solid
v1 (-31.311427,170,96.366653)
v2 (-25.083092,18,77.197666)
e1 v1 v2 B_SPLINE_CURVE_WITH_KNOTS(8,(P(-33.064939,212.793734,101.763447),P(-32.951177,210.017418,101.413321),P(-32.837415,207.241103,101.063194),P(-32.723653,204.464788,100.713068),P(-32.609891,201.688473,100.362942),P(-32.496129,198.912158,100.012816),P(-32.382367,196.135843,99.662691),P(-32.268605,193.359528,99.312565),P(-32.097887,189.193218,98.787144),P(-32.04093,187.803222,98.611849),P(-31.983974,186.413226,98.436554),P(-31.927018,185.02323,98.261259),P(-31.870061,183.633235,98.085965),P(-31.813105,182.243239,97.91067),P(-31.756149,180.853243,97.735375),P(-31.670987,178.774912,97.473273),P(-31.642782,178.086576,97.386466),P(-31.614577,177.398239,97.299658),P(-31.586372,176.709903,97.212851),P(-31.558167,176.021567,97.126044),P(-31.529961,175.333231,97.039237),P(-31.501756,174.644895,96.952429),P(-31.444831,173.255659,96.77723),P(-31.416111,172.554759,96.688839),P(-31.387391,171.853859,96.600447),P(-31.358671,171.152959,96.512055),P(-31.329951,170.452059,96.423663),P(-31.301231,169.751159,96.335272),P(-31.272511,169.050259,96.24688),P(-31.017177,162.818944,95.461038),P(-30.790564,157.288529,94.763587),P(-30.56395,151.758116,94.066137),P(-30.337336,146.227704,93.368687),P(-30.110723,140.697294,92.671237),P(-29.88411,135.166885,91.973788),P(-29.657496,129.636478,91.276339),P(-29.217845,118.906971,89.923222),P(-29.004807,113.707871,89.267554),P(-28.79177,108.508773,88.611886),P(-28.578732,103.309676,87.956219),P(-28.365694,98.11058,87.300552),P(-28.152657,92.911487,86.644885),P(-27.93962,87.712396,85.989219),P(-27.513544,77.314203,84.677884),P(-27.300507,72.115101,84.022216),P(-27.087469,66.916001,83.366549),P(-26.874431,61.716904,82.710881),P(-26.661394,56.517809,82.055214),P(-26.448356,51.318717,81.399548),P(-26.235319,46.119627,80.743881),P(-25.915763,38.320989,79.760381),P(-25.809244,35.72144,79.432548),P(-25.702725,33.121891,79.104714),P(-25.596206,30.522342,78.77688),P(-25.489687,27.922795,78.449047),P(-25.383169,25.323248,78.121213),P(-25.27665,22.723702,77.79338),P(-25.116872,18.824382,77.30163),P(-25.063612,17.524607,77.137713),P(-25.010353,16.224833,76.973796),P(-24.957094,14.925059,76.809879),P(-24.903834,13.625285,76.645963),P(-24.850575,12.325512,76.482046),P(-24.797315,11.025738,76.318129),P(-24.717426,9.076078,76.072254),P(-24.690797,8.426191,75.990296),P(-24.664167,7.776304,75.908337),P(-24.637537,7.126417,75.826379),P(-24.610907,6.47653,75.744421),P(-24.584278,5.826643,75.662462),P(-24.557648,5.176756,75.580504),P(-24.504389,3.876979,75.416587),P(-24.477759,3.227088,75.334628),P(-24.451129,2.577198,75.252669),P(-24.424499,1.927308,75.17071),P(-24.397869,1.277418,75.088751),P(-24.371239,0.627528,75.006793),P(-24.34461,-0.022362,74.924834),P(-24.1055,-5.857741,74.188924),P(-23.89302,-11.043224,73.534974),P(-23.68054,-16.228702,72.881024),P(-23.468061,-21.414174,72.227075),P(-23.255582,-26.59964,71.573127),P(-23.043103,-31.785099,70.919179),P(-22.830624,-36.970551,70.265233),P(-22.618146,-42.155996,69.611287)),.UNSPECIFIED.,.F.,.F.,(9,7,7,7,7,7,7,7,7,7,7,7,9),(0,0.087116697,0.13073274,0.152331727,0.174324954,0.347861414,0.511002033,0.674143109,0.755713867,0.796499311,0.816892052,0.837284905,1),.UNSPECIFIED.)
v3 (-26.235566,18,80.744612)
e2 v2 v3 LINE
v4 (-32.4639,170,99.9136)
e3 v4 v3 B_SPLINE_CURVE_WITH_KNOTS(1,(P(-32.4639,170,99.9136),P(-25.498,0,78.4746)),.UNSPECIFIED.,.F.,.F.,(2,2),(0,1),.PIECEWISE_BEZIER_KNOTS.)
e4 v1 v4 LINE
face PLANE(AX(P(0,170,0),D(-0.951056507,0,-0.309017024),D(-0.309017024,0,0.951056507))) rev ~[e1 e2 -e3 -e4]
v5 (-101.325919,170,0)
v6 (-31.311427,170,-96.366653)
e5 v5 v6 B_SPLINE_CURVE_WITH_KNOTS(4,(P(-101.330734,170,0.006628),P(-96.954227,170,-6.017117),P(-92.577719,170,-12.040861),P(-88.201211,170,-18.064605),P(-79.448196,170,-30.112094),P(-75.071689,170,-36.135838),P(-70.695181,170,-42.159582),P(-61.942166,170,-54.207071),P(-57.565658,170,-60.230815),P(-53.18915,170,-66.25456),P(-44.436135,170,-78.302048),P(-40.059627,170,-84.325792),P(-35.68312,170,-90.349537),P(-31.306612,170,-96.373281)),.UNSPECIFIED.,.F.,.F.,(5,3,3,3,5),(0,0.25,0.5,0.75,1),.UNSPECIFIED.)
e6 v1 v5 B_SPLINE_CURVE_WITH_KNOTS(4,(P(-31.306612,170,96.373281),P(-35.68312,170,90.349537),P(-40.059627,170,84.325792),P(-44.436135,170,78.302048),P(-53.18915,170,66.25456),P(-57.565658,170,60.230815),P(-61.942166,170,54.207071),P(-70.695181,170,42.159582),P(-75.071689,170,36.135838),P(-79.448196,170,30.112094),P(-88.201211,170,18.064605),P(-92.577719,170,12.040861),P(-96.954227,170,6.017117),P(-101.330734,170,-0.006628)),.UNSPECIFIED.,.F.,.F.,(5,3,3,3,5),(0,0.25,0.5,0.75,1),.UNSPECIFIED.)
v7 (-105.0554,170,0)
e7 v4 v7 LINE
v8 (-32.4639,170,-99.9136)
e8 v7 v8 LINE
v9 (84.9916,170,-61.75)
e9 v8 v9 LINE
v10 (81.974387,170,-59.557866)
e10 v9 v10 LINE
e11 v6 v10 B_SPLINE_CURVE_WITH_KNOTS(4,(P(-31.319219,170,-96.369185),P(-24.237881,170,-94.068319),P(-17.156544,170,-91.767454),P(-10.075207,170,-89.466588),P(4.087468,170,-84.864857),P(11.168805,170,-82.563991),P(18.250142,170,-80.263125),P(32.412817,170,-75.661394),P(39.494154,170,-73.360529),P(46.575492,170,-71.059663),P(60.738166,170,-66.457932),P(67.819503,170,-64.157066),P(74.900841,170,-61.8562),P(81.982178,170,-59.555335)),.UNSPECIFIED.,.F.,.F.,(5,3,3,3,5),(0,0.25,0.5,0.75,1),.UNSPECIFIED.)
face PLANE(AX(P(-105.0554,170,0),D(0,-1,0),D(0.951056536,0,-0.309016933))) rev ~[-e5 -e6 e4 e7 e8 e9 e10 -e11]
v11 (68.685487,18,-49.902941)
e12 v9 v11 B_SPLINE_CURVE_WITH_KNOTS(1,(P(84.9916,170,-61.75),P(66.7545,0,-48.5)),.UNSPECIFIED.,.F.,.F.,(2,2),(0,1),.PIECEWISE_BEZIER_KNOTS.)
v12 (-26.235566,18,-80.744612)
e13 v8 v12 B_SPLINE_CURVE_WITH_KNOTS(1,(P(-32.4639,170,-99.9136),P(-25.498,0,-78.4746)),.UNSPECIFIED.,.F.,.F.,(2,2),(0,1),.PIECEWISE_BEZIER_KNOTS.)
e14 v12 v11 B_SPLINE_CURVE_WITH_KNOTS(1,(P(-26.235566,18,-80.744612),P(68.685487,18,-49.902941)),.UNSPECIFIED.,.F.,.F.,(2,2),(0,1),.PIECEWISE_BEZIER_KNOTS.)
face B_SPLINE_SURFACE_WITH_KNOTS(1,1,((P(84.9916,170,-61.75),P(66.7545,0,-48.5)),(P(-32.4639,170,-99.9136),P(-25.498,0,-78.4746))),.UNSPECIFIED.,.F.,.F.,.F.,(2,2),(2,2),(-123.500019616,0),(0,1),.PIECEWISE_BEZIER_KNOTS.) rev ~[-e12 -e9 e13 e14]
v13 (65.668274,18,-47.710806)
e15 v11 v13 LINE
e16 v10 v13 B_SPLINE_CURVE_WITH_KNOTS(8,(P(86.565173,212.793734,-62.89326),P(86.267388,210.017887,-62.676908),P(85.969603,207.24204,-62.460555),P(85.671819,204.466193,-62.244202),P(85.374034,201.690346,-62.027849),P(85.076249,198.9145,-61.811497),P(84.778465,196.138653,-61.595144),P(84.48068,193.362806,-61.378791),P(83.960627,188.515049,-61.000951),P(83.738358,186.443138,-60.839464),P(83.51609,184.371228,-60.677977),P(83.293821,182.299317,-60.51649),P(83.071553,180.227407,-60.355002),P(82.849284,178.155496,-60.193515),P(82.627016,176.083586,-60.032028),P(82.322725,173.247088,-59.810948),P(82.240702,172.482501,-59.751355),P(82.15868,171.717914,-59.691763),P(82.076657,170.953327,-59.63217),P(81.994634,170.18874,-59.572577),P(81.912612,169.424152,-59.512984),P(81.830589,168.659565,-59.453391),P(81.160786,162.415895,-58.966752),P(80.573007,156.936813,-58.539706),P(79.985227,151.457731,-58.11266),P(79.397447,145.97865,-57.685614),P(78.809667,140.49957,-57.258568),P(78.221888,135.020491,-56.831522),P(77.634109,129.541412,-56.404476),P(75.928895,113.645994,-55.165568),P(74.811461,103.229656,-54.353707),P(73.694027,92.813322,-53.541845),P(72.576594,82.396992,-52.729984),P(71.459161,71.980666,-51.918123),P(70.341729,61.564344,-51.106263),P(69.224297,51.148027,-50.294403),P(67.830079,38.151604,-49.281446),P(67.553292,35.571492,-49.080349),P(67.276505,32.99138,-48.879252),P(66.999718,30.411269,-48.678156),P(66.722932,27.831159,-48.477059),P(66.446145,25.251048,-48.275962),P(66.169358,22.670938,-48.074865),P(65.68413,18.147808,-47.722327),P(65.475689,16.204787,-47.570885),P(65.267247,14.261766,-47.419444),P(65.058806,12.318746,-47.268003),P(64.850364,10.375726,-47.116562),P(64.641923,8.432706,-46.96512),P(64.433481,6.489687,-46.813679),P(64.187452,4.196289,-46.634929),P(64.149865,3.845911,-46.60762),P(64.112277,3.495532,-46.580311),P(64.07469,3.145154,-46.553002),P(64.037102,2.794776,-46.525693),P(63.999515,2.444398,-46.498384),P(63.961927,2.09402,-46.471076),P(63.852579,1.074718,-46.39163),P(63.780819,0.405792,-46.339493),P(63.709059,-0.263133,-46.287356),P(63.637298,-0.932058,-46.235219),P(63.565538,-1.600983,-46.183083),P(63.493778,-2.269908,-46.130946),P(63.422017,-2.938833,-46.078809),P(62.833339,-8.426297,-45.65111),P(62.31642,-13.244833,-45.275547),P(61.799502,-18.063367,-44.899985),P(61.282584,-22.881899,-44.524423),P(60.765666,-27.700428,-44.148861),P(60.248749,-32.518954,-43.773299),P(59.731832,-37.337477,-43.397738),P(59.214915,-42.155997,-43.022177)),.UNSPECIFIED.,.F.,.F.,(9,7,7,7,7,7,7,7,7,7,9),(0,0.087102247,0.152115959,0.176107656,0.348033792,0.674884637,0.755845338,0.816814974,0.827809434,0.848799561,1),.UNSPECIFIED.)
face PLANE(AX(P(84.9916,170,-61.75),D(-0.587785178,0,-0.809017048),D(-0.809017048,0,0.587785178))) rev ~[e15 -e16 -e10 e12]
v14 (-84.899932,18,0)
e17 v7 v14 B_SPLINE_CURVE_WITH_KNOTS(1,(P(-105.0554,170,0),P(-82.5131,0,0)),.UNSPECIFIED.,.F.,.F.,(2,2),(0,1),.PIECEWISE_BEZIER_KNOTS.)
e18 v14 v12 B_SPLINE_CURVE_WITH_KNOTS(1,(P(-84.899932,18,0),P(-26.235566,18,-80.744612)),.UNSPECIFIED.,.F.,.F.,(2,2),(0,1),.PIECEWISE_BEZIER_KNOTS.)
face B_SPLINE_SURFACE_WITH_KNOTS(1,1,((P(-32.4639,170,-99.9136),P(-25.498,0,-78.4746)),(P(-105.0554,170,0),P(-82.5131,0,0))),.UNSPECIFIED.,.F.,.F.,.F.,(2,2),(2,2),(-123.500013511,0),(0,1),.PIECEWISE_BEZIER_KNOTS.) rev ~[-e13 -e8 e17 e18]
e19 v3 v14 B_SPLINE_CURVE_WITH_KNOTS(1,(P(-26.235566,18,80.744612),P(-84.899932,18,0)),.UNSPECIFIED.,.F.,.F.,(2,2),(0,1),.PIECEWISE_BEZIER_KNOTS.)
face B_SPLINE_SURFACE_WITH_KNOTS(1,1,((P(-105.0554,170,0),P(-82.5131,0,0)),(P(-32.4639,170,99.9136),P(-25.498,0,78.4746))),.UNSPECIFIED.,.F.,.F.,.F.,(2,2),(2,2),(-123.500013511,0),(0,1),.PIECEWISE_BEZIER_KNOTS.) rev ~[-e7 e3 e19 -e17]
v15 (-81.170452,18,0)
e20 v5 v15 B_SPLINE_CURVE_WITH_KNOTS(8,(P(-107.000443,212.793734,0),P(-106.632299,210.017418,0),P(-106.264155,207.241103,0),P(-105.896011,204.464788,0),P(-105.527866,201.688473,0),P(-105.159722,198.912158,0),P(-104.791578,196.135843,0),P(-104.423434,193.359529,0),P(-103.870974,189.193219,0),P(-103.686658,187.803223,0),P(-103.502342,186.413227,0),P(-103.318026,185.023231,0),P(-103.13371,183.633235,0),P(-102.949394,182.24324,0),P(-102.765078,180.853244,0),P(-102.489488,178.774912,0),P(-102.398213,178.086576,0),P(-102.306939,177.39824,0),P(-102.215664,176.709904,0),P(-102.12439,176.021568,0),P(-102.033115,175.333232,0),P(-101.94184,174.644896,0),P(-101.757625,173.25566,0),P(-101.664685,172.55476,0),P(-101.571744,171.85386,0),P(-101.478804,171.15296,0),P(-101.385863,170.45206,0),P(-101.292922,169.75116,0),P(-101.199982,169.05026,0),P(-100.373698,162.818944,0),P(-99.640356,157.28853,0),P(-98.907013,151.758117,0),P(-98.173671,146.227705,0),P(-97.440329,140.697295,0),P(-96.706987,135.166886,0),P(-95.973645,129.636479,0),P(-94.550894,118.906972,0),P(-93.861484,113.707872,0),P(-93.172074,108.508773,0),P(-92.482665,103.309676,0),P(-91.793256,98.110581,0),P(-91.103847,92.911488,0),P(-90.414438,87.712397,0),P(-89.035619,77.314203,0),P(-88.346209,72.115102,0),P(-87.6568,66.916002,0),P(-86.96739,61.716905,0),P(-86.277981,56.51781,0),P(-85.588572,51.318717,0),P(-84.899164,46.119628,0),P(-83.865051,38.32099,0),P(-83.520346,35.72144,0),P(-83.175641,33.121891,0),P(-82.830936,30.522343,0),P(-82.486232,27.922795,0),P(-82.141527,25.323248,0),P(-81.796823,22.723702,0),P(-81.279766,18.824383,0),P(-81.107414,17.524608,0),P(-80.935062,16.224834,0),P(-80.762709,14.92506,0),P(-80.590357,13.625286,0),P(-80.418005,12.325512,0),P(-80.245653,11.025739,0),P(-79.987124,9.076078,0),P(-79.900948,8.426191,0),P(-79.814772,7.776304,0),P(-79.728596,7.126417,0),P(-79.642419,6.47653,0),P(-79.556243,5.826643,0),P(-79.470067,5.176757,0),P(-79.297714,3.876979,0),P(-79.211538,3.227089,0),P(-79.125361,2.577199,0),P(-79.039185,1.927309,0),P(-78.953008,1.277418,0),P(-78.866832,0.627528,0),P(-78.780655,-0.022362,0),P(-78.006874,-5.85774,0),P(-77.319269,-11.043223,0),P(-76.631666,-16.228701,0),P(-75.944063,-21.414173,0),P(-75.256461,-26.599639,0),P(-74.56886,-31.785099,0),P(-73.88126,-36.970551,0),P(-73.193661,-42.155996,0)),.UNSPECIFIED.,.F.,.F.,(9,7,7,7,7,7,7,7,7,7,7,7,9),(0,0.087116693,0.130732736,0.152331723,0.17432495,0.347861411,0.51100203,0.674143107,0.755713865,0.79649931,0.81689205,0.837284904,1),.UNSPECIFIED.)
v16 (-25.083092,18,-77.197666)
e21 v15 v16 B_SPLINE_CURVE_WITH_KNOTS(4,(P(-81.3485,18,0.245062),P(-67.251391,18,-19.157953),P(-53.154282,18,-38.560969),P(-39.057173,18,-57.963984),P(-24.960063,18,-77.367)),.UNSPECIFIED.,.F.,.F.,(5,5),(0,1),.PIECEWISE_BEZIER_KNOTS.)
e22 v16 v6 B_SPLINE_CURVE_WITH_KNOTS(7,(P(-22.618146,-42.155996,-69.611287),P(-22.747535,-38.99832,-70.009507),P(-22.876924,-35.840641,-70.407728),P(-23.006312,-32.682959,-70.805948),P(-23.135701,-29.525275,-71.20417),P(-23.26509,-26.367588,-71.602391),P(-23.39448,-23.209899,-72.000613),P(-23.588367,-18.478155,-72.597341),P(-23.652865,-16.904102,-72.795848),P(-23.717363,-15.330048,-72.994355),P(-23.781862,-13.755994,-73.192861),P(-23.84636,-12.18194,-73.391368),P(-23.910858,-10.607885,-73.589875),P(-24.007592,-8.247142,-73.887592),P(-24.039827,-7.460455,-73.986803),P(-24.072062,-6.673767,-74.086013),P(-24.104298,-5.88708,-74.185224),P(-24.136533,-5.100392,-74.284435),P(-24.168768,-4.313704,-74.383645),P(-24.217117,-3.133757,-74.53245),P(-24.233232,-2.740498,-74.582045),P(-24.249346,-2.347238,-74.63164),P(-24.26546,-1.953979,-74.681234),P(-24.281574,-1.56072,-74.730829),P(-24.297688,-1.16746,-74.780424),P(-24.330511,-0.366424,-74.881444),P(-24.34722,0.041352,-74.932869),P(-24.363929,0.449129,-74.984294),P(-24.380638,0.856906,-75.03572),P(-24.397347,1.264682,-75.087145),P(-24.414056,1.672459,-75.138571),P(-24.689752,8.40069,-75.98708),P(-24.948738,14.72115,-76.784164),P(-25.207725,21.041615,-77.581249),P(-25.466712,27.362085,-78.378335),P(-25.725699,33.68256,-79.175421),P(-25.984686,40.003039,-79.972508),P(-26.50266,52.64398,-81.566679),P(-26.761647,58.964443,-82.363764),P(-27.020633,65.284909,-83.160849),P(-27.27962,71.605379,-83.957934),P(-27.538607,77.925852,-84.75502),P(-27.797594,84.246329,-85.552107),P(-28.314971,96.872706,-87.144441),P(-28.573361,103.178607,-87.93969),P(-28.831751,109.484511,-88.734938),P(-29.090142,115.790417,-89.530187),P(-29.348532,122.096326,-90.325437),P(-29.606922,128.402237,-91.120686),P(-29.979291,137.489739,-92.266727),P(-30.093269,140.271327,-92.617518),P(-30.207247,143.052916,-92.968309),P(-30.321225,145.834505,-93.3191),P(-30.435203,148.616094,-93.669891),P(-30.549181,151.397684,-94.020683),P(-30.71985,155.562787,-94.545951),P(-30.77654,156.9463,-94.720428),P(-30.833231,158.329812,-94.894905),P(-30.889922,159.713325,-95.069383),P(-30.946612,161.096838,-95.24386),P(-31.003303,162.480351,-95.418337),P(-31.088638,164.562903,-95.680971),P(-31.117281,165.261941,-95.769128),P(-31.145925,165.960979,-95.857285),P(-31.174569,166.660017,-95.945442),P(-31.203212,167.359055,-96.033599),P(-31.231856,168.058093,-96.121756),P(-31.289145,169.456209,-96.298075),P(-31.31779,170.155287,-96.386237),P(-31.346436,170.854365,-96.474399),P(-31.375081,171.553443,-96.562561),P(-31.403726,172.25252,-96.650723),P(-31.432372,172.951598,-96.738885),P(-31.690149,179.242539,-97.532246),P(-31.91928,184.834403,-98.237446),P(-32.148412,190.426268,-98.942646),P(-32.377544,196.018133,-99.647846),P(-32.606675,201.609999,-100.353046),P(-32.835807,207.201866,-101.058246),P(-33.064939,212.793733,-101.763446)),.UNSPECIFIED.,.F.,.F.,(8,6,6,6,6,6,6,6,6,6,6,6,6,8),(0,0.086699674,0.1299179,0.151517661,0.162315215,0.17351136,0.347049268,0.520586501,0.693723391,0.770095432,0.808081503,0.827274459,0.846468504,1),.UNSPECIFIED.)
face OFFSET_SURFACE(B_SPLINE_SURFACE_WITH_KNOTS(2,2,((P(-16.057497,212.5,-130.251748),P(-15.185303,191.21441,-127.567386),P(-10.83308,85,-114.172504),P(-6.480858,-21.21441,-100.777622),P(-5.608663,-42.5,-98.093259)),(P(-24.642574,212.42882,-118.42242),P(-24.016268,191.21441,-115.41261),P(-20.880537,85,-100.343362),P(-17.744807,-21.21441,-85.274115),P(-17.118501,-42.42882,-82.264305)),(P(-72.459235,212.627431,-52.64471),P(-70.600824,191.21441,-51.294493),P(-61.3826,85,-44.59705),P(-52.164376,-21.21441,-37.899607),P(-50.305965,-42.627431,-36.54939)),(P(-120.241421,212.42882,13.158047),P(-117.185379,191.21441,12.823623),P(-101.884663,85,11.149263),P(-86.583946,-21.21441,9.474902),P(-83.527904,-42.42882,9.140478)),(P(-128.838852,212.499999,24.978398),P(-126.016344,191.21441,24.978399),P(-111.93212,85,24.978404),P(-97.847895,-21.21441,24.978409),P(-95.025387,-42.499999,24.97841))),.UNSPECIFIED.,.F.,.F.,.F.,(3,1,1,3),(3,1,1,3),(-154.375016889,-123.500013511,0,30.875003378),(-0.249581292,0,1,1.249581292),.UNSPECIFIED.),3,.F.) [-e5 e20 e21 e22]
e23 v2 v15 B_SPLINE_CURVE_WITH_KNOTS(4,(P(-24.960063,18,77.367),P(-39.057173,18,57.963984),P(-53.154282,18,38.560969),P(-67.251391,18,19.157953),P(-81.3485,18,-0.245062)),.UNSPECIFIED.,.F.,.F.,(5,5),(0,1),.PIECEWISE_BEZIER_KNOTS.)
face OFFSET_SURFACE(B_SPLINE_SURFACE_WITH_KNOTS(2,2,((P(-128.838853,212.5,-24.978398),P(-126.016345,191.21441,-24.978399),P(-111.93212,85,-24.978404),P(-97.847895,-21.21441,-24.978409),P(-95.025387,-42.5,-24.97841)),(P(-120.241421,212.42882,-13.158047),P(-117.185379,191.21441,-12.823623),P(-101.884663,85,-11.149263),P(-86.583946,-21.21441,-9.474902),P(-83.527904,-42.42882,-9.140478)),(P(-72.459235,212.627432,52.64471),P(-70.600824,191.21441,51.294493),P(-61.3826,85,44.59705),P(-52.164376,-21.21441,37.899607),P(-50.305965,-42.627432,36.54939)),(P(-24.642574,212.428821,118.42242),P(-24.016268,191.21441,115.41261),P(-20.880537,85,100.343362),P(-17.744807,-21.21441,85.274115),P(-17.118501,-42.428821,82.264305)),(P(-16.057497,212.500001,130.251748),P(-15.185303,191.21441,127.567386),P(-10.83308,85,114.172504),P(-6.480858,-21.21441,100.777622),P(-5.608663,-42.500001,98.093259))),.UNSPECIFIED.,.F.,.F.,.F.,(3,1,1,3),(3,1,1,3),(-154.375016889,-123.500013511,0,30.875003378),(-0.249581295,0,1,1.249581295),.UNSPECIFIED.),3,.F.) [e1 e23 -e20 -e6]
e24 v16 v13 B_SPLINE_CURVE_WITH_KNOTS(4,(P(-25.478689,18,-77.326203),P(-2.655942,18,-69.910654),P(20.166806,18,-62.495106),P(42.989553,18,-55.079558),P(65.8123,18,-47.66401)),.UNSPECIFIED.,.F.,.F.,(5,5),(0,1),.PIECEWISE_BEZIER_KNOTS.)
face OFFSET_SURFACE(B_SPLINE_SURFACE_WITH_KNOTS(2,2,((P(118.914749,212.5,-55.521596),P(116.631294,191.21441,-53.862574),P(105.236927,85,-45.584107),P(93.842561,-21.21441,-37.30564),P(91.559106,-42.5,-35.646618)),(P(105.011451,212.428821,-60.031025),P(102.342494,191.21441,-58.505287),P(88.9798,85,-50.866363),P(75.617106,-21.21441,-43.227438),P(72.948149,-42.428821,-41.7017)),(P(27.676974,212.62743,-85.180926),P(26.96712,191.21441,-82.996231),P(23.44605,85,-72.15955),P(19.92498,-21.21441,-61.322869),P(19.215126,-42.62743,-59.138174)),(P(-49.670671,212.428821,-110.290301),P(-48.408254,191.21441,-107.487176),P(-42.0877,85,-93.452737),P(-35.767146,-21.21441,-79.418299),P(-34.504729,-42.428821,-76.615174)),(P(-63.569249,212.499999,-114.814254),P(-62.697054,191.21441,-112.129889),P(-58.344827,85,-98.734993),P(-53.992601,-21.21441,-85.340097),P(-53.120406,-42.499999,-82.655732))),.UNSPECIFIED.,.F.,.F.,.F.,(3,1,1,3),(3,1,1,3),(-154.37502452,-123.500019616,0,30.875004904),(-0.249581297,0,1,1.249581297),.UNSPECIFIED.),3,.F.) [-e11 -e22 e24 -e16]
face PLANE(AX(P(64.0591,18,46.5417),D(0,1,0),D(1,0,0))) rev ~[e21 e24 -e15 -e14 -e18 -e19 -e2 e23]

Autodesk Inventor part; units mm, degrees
sketch "草图1" plane through (0, 0, 0) normal (0, 1, 0) x (-1, 0, 0)
  line L0 (82.5131, 0) -> (25.498, -78.4746)
  line L1 (25.498, -78.4746) -> (-66.7545, -48.5)
  line L2 (-66.7545, -48.5) -> (-66.7545, 48.5)
  line L3 (-66.7545, 48.5) -> (25.498, 78.4746)
  line L4 (25.498, 78.4746) -> (82.5131, 0)
  point P0 (0, 0)
  point P1 (0, 0)
  dimension "d0" = 97
ref_plane "工作平面1" through (0, 170, 0) normal (0, 1, 0) x (-1, 0, 0)
sketch "草图2" plane through (0, 170, 0) normal (0, 1, 0) x (-1, 0, 0)
  line L0 (105.0554, 0) -> (32.4639, -99.9136)
  line L1 (32.4639, -99.9136) -> (-84.9916, -61.75)
  line L2 (-84.9916, -61.75) -> (-84.9916, 61.75)
  line L3 (-84.9916, 61.75) -> (32.4639, 99.9136)
  line L4 (32.4639, 99.9136) -> (105.0554, 0)
  point P0 (0, 0)
  point P1 (0, 0)
  dimension "d2" = 123.5
loft "放样1" add profiles "草图2", "草图1"
sketch "草图3" plane through (84.9916, 170, 61.75) normal (0, 1, 0) x (1, 0, 0)
  line L0 (-153.2988, 61.75) -> (-106.0997, 126.7141)
  line L1 (-106.0997, 126.7141) -> (-29.7298, 101.9)
  line L2 (-29.7298, 101.9) -> (-29.7298, 21.6)
  line L3 (-29.7298, 21.6) -> (-106.0997, -3.2141)
  line L4 (-106.0997, -3.2141) -> (-153.2988, 61.75)
  point P0 (-84.9916, 61.75)
  point P1 (-84.9916, 61.75)
  dimension "d7" = 80.3
extrude "拉伸1" cut sketch "草图3" against normal blind 164
shell "抽壳1" thickness 3 removed faces 1 at (10.4732, 170, -75.5426)
sketch "草图5" plane through (66.7545, 0, -48.5) normal (0, -1, 0) x (1, 0, 0)
  line L0 (-98.0659, 144.8667) -> (-91.2229, 123.806) projected
  line L1 (-106.5917, 71.5) -> (-123.9122, 81.5)
  line L2 (-107.7408, 69.3836) -> (-125.561, 78.4634)
  arc A0 (-106.5917, 71.5) -> (-107.7408, 69.3836) centre (-66.7545, 48.5) ccw
  arc A1 (-123.9122, 81.5) -> (-125.561, 78.4634) centre (-66.7545, 48.5) ccw
  point P0 (-99.2814, 81.0269)
  dimension "d37" = 132
  dimension "d38" = 92
  dimension "d40" = 3
extrude "拉伸2" add sketch "草图5" along normal blind 3
sketch "草图7" plane through (66.7545, -3, -48.5) normal (0, -1, 0) x (1, 0, 0)
  arc A0 (-100.9392, 79.28) -> (-106.5917, 71.5) centre (-66.7545, 48.5) ccw
  arc A1 (-115.8021, 92.6626) -> (-125.561, 78.4634) centre (-66.7545, 48.5) ccw
  arc A2 (-100.9392, 79.28) -> (-107.7408, 69.3836) centre (-66.7545, 48.5) ccw
  line L0 (-100.9392, 79.28) -> (-115.8021, 92.6626)
  line L1 (-125.561, 78.4634) -> (-107.7408, 69.3836) projected
  line L2 (-107.7408, 69.3836) -> (-125.561, 78.4634)
  dimension "d25" = 92
  dimension "d41" = 15
extrude "拉伸3" add sketch "草图7" along normal blind 3
chamfer "倒角1" distance 1 angle 45 1 edges at (-41.6161, -3, 37.4713)
sketch "草图8" plane through (66.7545, 0, -48.5) normal (0, -1, 0) x (1, 0, 0)
  circle A0 centre (-66.7545, 48.5) radius 15
  dimension "d100" = 30
extrude "拉伸4" add sketch "草图8" along normal blind 30
pattern_circular "环形阵列1" count 10 over 360 about axis through (0, -10, 0) along (0, 1, 0) of "拉伸3", "拉伸2", "倒角1"
sketch "草图9" plane through (64.0591, 3, 46.5417) normal (0, 1, 0) x (1, 0, 0)
  line L0 (-132.3664, 46.5417) -> (-85.1672, 111.5058) projected
  line L1 (-85.1672, -18.4224) -> (-132.3664, 46.5417) projected
  line L2 (-8.7974, 6.3917) -> (-85.1672, -18.4224) projected
  line L3 (-8.7974, 86.6917) -> (-8.7974, 6.3917) projected
  line L4 (-85.1672, 111.5058) -> (-8.7974, 86.6917) projected
  line L5 (-136.0746, 46.5417) -> (-86.3131, -21.9491) projected
  line L6 (-86.3131, -21.9491) -> (-5.7974, 4.2121) projected
  line L7 (-5.7974, 4.2121) -> (-5.7974, 88.8713) projected
  line L8 (-5.7974, 88.8713) -> (-86.3131, 115.0325) projected
  line L9 (-86.3131, 115.0325) -> (-136.0746, 46.5417) projected
  line L10 (-85.1672, -18.4224) -> (-132.3664, 46.5417) projected
  line L11 (-132.3664, 46.5417) -> (-85.1672, 111.5058) projected
  line L12 (-85.1672, 111.5058) -> (-8.7974, 86.6917) projected
  line L13 (-8.7974, 86.6917) -> (-8.7974, 6.3917) projected
  line L14 (-8.7974, 6.3917) -> (-85.1672, -18.4224) projected
  line L15 (-143.2406, 46.5417) -> (-88.5276, 121.8477) projected
  line L16 (-88.5276, -28.7643) -> (-143.2406, 46.5417) projected
  line L17 (0, 0) -> (-88.5276, -28.7643) projected
  line L18 (0, 93.0834) -> (0, 0) projected
  line L19 (-88.5276, 121.8477) -> (0, 93.0834) projected
  line L20 (-145.4076, 46.5417) -> (-89.1972, 123.9087)
  line L21 (-89.1972, 123.9087) -> (1.7532, 94.3571)
  line L22 (1.7532, 94.3571) -> (1.7532, -1.2738)
  line L23 (1.7532, -1.2738) -> (-89.1972, -30.8253)
  line L24 (-89.1972, -30.8253) -> (-145.4076, 46.5417)
  point P0 (-64.0591, 46.5417)
extrude "拉伸5" add sketch "草图9" along normal blind 15 contours L15 L19 L18 L17 L16 | L20 L21 L22 L23 L24
sketch "草图10" plane through (84.9916, 6, 61.75) normal (0, 1, 0) x (1, 0, 0)
  line L0 (-153.2988, 61.75) -> (-106.0997, 126.7141) projected
  line L1 (-106.0997, -3.2141) -> (-153.2988, 61.75) projected
  line L2 (-29.7298, 21.6) -> (-106.0997, -3.2141) projected
  line L3 (-29.7298, 101.9) -> (-29.7298, 21.6) projected
  line L4 (-106.0997, 126.7141) -> (-29.7298, 101.9) projected
  line L5 (-107.2456, 130.2408) -> (-157.007, 61.75) projected
  line L6 (-26.7298, 104.0796) -> (-107.2456, 130.2408) projected
  line L7 (-26.7298, 19.4204) -> (-26.7298, 104.0796) projected
  line L8 (-107.2456, -6.7408) -> (-26.7298, 19.4204) projected
  line L9 (-157.007, 61.75) -> (-107.2456, -6.7408) projected
  line L10 (-166.1621, 61.75) -> (-110.0746, 138.9477) projected
  line L11 (-110.0746, -15.4477) -> (-166.1621, 61.75) projected
  line L12 (-19.3233, 14.0392) -> (-110.0746, -15.4477) projected
  line L13 (-19.3233, 109.4608) -> (-19.3233, 14.0392) projected
  line L14 (-110.0746, 138.9477) -> (-19.3233, 109.4608) projected
  point P0 (-84.9916, 61.75)
sketch "草图11" plane through (64.0591, 18, 46.5417) normal (0, 1, 0) x (1, 0, 0)
  line L0 (-64.0591, 46.5417) -> (2.6954, 46.5417) construction
  line L1 (-86.3131, 115.0325) -> (-136.0746, 46.5417) projected
  line L2 (-5.7974, 88.8713) -> (-86.3131, 115.0325) projected
  line L3 (-5.7974, 4.2121) -> (-5.7974, 88.8713) projected
  line L4 (-86.3131, -21.9491) -> (-5.7974, 4.2121) projected
  line L5 (-136.0746, 46.5417) -> (-86.3131, -21.9491) projected
  line L6 (-145.2296, 46.5417) -> (-89.1422, 123.7394) projected
  line L7 (-89.1422, -30.656) -> (-145.2296, 46.5417) projected
  line L8 (1.6092, -1.1691) -> (-89.1422, -30.656) projected
  line L9 (1.6092, 94.2525) -> (1.6092, -1.1691) projected
  line L10 (-89.1422, 123.7394) -> (1.6092, 94.2525) projected
  circle A0 centre (-2.0908, 11.2121) radius 1.25
  line L11 (-5.7974, 4.2121) -> (1.6092, -1.1691) construction
  line L12 (-5.7974, 4.2121) -> (-5.7974, 88.8713) projected
  line L13 (-86.3131, -21.9491) -> (-5.7974, 4.2121) projected
  line L14 (1.6092, -1.1691) -> (-89.1422, -30.656) projected
  line L15 (1.6092, 94.2525) -> (1.6092, -1.1691) projected
  circle A1 centre (-11.3094, -1.4762) radius 1.25
  line L16 (-2.0941, 7.5215) -> (-0.5941, 7.5215)
  line L17 (-0.5941, 7.5215) -> (-0.5941, 0.4317)
  line L18 (-2.0941, 7.5215) -> (-3.5941, 7.5215)
  line L19 (-3.5941, 7.5215) -> (-3.5941, 2.6113)
  line L20 (-7.8005, -0.3326) -> (-7.3369, -1.7592)
  line L21 (-7.3369, -1.7592) -> (-0.5941, 0.4317)
  line L22 (-7.8005, -0.3326) -> (-8.264, 1.094)
  line L23 (-8.264, 1.094) -> (-3.5941, 2.6113)
  dimension "d63" = 2.5
  dimension "d69" = 3.7
  dimension "d131" = 3.6906
extrude "拉伸7" cut sketch "草图11" against normal blind 3 contours A0 | A1 | L16 L17 L21 L20 L22 L23 L19 L18
extrude "拉伸8" add sketch "草图10" along normal blind 10 and the other way blind 3 contours L10 L14 L13 L12 L11
extrude "拉伸9" cut sketch "草图10" along normal blind 10 and the other way blind 3 contours L10 L14 L13 L12 L11
ref_plane "工作平面2" through (84.9916, 7, 61.75) normal (0, 1, 0) x (1, 0, 0)
sketch "草图12" plane through (84.9916, 7, 61.75) normal (0, 1, 0) x (1, 0, 0)
  line L0 (-107.2456, -6.7408) -> (-26.7298, 19.4204) projected
  line L1 (-60.7054, 8.3811) -> (-61.6324, 11.2342)
  line L2 (-29.7298, 21.6) -> (-106.0997, -3.2141) projected
  line L3 (-89.8404, 2.0689) -> (-88.9133, -0.7843)
  line L4 (-107.2456, -6.7408) -> (-26.7298, 19.4204) projected
  line L5 (-29.7298, 21.6) -> (-106.0997, -3.2141) projected
  line L6 (-63.5345, 10.6162) -> (-62.6075, 7.763)
  line L7 (-65.4366, 9.9982) -> (-64.5096, 7.145)
  line L8 (-67.3388, 9.3801) -> (-66.4117, 6.527)
  line L9 (-69.2409, 8.7621) -> (-68.3138, 5.9089)
  line L10 (-71.143, 8.1441) -> (-70.2159, 5.2909)
  line L11 (-73.0451, 7.526) -> (-72.118, 4.6729)
  line L12 (-74.9472, 6.908) -> (-74.0202, 4.0548)
  line L13 (-76.7905, 6.3091) -> (-75.7638, 3.4883)
  line L14 (-84.134, 3.923) -> (-83.207, 1.0698)
  line L15 (-86.0362, 3.305) -> (-85.1091, 0.4518)
  line L16 (-87.9383, 2.6869) -> (-87.0112, -0.1662)
  line L17 (-80.3298, 5.1591) -> (-79.4028, 2.3059)
  line L18 (-82.2319, 4.541) -> (-81.3049, 1.6879)
  line L19 (-78.4277, 5.7771) -> (-77.5006, 2.9239)
  line L20 (-61.6324, 11.2342) -> (-63.5345, 10.6162)
  line L21 (-62.6075, 7.763) -> (-60.7054, 8.3811)
  line L22 (-66.4117, 6.527) -> (-64.5096, 7.145)
  line L23 (-65.4366, 9.9982) -> (-67.3388, 9.3801)
  line L24 (-70.2159, 5.2909) -> (-68.3138, 5.9089)
  line L25 (-69.2409, 8.7621) -> (-71.143, 8.1441)
  line L26 (-74.0202, 4.0548) -> (-72.118, 4.6729)
  line L27 (-73.0451, 7.526) -> (-74.9472, 6.908)
  line L28 (-76.7905, 6.3091) -> (-78.4277, 5.7771)
  line L29 (-77.5006, 2.9239) -> (-75.7638, 3.4883)
  line L30 (-81.3049, 1.6879) -> (-79.4028, 2.3059)
  line L31 (-80.3298, 5.1591) -> (-82.2319, 4.541)
  line L32 (-84.134, 3.923) -> (-86.0362, 3.305)
  line L33 (-87.9383, 2.6869) -> (-89.8404, 2.0689)
  line L34 (-88.9133, -0.7843) -> (-87.0112, -0.1662)
  line L35 (-85.1091, 0.4518) -> (-83.207, 1.0698)
  line L36 (-58.8033, 8.9991) -> (-59.7303, 11.8523)
  line L37 (-56.9011, 9.6171) -> (-57.8282, 12.4703)
  line L38 (-54.999, 10.2352) -> (-55.9261, 13.0883)
  line L39 (-53.0969, 10.8532) -> (-54.024, 13.7064)
  point P0 (-84.9916, 61.75)
  dimension "d73" = 2
  dimension "d74" = 2
  dimension "d75" = 2
  dimension "d76" = 2
  dimension "d77" = 2
  dimension "d78" = 2
  dimension "d79" = 2
  dimension "d80" = 2
  dimension "d81" = 2
  dimension "d82" = 2
  dimension "d83" = 2
  dimension "d84" = 2
  dimension "d85" = 2
  dimension "d86" = 2
  dimension "d88" = 2
  dimension "d89" = 2
  dimension "d90" = 2
  dimension "d91" = 2
extrude "拉伸10" cut sketch "草图12" along normal blind 7 contours L3 L2 L16 L0 | L15 L2 L14 L0 | L18 L2 L17 L0 | L19 L2 L13 L0 | L12 L2 L11 L0 | L10 L2 L9 L0 | L8 L2 L7 L0 | L6 L2 L1 L0 | L36 L2 L37 L0 | L38 L2 L39 L0
pattern_circular "环形阵列2" count 5 over 360 about axis through (0, 0, 0) along (0, -1, 0) of "拉伸10"
sketch "草图13" plane through (66.7545, 0, -48.5) normal (0, -1, 0) x (1, 0, 0)
  line L0 (1.9326, 98.4258) -> (-1.1068, 96.2175) construction
  line L1 (18.2371, 110.25) -> (0, 97) construction
  line L2 (-16.2555, 104.3138) -> (1.9326, 98.4258)
  line L3 (1.9326, 98.4258) -> (1.9326, 79.28)
  line L4 (-14.6399, 100.6147) -> (-1.1068, 96.2175)
  line L5 (-1.0862, 96.2108) -> (-1.0862, 81.9597)
  line L6 (-1.0862, 81.9597) -> (1.9326, 79.28)
  line L7 (-14.6399, 100.6147) -> (-16.2555, 104.3138)
  line L8 (1.9326, 98.4258) -> (1.9326, 79.28)
  line L9 (1.9326, 79.28) -> (-1.0862, 81.9597)
  line L10 (-1.0862, 0.7892) -> (-1.0862, 96.2108) projected
  line L11 (-1.0862, 81.9597) -> (-1.0862, 96.2108)
  line L12 (-1.0862, 96.2108) -> (-14.6399, 100.6147)
  line L13 (-91.8376, 125.6977) -> (-1.0862, 96.2108) projected
  line L14 (0, 97) -> (-92.2525, 126.9746) projected
  line L15 (-14.6399, 100.6147) -> (-16.2555, 104.3138)
  line L16 (-16.2555, 104.3138) -> (1.9326, 98.4258)
  point P0 (-66.7545, 48.5)
  point P1 (18.2371, 110.25)
extrude "拉伸11" cut sketch "草图13" against normal blind 16
sketch "草图14" plane through (0, -30, 0) normal (0, -1, 0) x (1, 0, 0)
  line L0 (11.4602, -0.9019) -> (-11.5398, -0.9019)
  line L1 (-11.5398, -0.9019) -> (-11.5398, 0.7981)
  line L2 (-11.5398, 0.7981) -> (11.4602, 0.7981)
  line L3 (11.4602, 0.7981) -> (11.4602, -0.9019)
  line L4 (15.9292, -0.0519) -> (-16.622, -0.0519) construction
  line L5 (-0.0398, 4.6584) -> (-0.0398, -5.7431) construction
  point P0 (0, 0)
  dimension "d94" = 23
  dimension "d95" = 1.7
extrude "拉伸12" cut sketch "草图14" along normal blind 10 and the other way blind 54.75
sketch "草图15" plane through (0, -30, 0) normal (0, -1, 0) x (1, 0, 0)
  line L0 (11.4602, 0.7981) -> (-11.5398, 0.7981) projected
  line L1 (9.9602, 0.7981) -> (-10.0398, 0.7981)
  line L2 (-10.0398, 0.7981) -> (-10.0398, 2.5981)
  line L3 (-10.0398, 2.5981) -> (9.9602, 2.5981)
  line L4 (9.9602, 2.5981) -> (9.9602, 0.7981)
  line L5 (11.4602, -0.9019) -> (-11.5398, -0.9019) projected
  line L6 (-0.0398, 30.3943) -> (-0.0398, -31.216) construction
  point P0 (0, 0)
  dimension "d101" = 3.5
  dimension "d102" = 20
extrude "拉伸13" cut sketch "草图15" against normal blind 30
sketch "草图16" plane through (0, -30, 0) normal (0, -1, 0) x (1, 0, 0)
  line L0 (11.4602, 0.7981) -> (-11.5398, 0.7981) projected
  line L1 (-5.5398, 0.7981) -> (5.4602, 0.7981)
  line L2 (5.4602, 0.7981) -> (5.4602, 6.5981)
  line L3 (5.4602, 6.5981) -> (-5.5398, 6.5981)
  line L4 (-5.5398, 6.5981) -> (-5.5398, 0.7981)
  line L5 (11.4602, -0.9019) -> (-11.5398, -0.9019) projected
  line L6 (-0.0398, 25.7819) -> (-0.0398, -22.2478) construction
  point P0 (0, 0)
  dimension "d105" = 7.5
  dimension "d106" = 11
extrude "拉伸14" cut sketch "草图16" against normal blind 6
ref_plane "工作平面3" through (0, -28, 0) normal (0, -1, 0) x (1, 0, 0)
sketch "草图18" plane through (0, -28, 0) normal (0, -1, 0) x (1, 0, 0)
  line L0 (5.4602, 6.5981) -> (5.4602, 2.5981) projected
  line L1 (5.4602, 2.5981) -> (9.9602, 2.5981) projected
  line L2 (9.9602, 2.5981) -> (9.9602, 0.7981) projected
  line L3 (9.9602, 0.7981) -> (11.4602, 0.7981) projected
  line L4 (11.4602, 0.7981) -> (11.4602, -0.9019) projected
  line L5 (11.4602, -0.9019) -> (-11.5398, -0.9019) projected
  line L6 (-11.5398, -0.9019) -> (-11.5398, 0.7981) projected
  line L7 (-11.5398, 0.7981) -> (-10.0398, 0.7981) projected
  line L8 (-10.0398, 0.7981) -> (-10.0398, 2.5981) projected
  line L9 (-10.0398, 2.5981) -> (-5.5398, 2.5981) projected
  line L10 (-5.5398, 2.5981) -> (-5.5398, 6.5981) projected
  line L11 (-5.5398, 6.5981) -> (5.4602, 6.5981) projected
  circle A0 centre (0, 0) radius 15 projected
  line L12 (-12.5398, -1.9019) -> (12.4602, -1.9019)
  line L13 (12.4602, -1.9019) -> (12.4602, 1.7981)
  line L14 (12.4602, 1.7981) -> (10.9602, 1.7981)
  line L15 (10.9602, 1.7981) -> (10.9602, 3.5981)
  line L16 (10.9602, 3.5981) -> (6.4602, 3.5981)
  line L17 (6.4602, 3.5981) -> (6.4602, 7.5981)
  line L18 (6.4602, 7.5981) -> (-6.5398, 7.5981)
  line L19 (-6.5398, 7.5981) -> (-6.5398, 3.5981)
  line L20 (-6.5398, 3.5981) -> (-11.0398, 3.5981)
  line L21 (-11.0398, 3.5981) -> (-11.0398, 1.7981)
  line L22 (-11.0398, 1.7981) -> (-12.5398, 1.7981)
  line L23 (-12.5398, 1.7981) -> (-12.5398, -1.9019)
  circle A1 centre (0, 0) radius 14
  point P0 (0, 0)
  dimension "d110" = 1
  dimension "d111" = 1
extrude "拉伸15" cut sketch "草图18" against normal blind 30 contours A1
sketch "草图19" plane through (66.7545, 0, -48.5) normal (0, -1, 0) x (1, 0, 0)
  line L0 (-60.2943, 56.0981) -> (-73.2943, 56.0981) projected
  line L1 (-73.2943, 52.0981) -> (-77.7943, 52.0981) projected
  line L2 (-60.2943, 56.0981) -> (-73.2943, 56.0981)
  line L3 (-73.2943, 56.0981) -> (-73.2943, 52.0981)
  line L4 (-73.2943, 52.0981) -> (-60.2943, 52.0981)
  line L5 (-60.2943, 52.0981) -> (-60.2943, 56.0981)
  point P0 (-66.7545, 48.5)
extrude "拉伸16" cut sketch "草图19" along normal blind 22 and the other way blind 2
sketch "草图21" plane through (0, -30, 0) normal (0, -1, 0) x (1, 0, 0)
  line L0 (5.4602, 6.5981) -> (5.4602, 2.5981) projected
  line L1 (5.4602, 2.5981) -> (9.9602, 2.5981) projected
  line L2 (9.9602, 2.5981) -> (9.9602, 0.7981) projected
  line L3 (9.9602, 0.7981) -> (11.4602, 0.7981) projected
  line L4 (11.4602, 0.7981) -> (11.4602, -0.9019) projected
  line L5 (11.4602, -0.9019) -> (-11.5398, -0.9019) projected
  line L6 (-11.5398, -0.9019) -> (-11.5398, 0.7981) projected
  line L7 (-11.5398, 0.7981) -> (-10.0398, 0.7981) projected
  line L8 (-10.0398, 0.7981) -> (-10.0398, 2.5981) projected
  line L9 (-10.0398, 2.5981) -> (-5.5398, 2.5981) projected
  line L10 (-5.5398, 2.5981) -> (-5.5398, 6.5981) projected
  line L11 (-5.5398, 6.5981) -> (5.4602, 6.5981) projected
  circle A0 centre (0, 0) radius 15 projected
  point P0 (0, 0)
extrude "拉伸17" add sketch "草图21" along normal blind 3
sketch "草图22" plane through (5.4602, -24, 6.5981) normal (0, 0, -1) x (-1, 0, 0)
  line L0 (9.1141, -4) -> (1.9525, -4)
  line L1 (1.9525, -4) -> (9.1141, -4)
  line L2 (9.1141, -4) -> (9.1141, -9.2971)
  line L3 (9.1141, -9.2971) -> (1.9525, -9.2971)
  line L4 (1.9525, -9.2971) -> (1.9525, -4)
  point P0 (5.4602, 24)
extrude "拉伸18" cut sketch "草图22" against normal blind 10
sketch "草图23" plane through (0, -33, 0) normal (0, -1, 0) x (1, 0, 0)
  line L0 (5.555, -0.8779) -> (-5.9531, -0.8779)
  line L1 (-5.9531, -0.8779) -> (-5.9531, -3.3779)
  line L2 (-5.9531, -3.3779) -> (5.555, -3.3779)
  line L3 (5.555, -3.3779) -> (5.555, -0.8779)
  point P0 (0, 0)
  dimension "d125" = 2.5
extrude "拉伸19" cut sketch "草图23" against normal blind 10
sketch "草图24" plane through (64.0591, 18, 46.5417) normal (0, 1, 0) x (1, 0, 0)
  line L0 (-75.5989, 45.7436) -> (-75.5989, 47.4436) projected
  line L1 (-75.5989, 47.4436) -> (-52.5989, 47.4436) projected
  line L2 (-52.5989, 47.4436) -> (-52.5989, 45.7436) projected
  line L3 (-52.5989, 45.7436) -> (-75.5989, 45.7436) projected
  line L4 (-132.3664, 46.5417) -> (-85.1672, 111.5058) projected
  line L5 (-85.1672, -18.4224) -> (-132.3664, 46.5417) projected
  line L6 (-8.7974, 6.3917) -> (-85.1672, -18.4224) projected
  line L7 (-8.7974, 86.6917) -> (-8.7974, 6.3917) projected
  line L8 (-85.1672, 111.5058) -> (-8.7974, 86.6917) projected
  line L9 (-2.9869, 2.1701) -> (-87.3867, -25.2531)
  line L10 (-87.3867, -25.2531) -> (-139.5486, 46.5417)
  line L11 (-139.5486, 46.5417) -> (-87.3867, 118.3364)
  line L12 (-87.3867, 118.3364) -> (-2.9869, 90.9133)
  line L13 (-2.9869, 90.9133) -> (-2.9869, 2.1701)
  line L14 (36.2149, -26.3117) -> (-102.3604, -71.3375)
  line L15 (-102.3604, -71.3375) -> (-188.0047, 46.5417)
  line L16 (-188.0047, 46.5417) -> (-102.3604, 164.4209)
  line L17 (-102.3604, 164.4209) -> (36.2149, 119.3951)
  line L18 (36.2149, 119.3951) -> (36.2149, -26.3117)
  point P0 (-64.0591, 46.5417)
extrude "拉伸20" cut sketch "草图24" along normal blind 1000 contours L14 L15 L16 L17 L18 keep common part
sketch "草图25" plane through (84.9916, 170, 61.75) normal (0, 1, 0) x (1, 0, 0)
  line L0 (0, 0) -> (-117.4555, -38.1636) projected
  line L1 (-84.9916, 61.75) -> (-117.4555, -38.1636)
  line L2 (-117.4555, -38.1636) -> (-259.2708, 40.5435)
  line L3 (-259.2708, 40.5435) -> (-138.2007, 195.9296)
  line L4 (-138.2007, 195.9296) -> (51.1158, 164.3125)
  line L5 (-117.4555, 161.6636) -> (0, 123.5) projected
  line L6 (51.1158, 164.3125) -> (0, 123.5)
  line L7 (0, 123.5) -> (-84.9916, 61.75)
extrude "拉伸21" cut sketch "草图25" against normal blind 300 keep common part
properties part number "花盆主体" material "尼龙 6/6"
